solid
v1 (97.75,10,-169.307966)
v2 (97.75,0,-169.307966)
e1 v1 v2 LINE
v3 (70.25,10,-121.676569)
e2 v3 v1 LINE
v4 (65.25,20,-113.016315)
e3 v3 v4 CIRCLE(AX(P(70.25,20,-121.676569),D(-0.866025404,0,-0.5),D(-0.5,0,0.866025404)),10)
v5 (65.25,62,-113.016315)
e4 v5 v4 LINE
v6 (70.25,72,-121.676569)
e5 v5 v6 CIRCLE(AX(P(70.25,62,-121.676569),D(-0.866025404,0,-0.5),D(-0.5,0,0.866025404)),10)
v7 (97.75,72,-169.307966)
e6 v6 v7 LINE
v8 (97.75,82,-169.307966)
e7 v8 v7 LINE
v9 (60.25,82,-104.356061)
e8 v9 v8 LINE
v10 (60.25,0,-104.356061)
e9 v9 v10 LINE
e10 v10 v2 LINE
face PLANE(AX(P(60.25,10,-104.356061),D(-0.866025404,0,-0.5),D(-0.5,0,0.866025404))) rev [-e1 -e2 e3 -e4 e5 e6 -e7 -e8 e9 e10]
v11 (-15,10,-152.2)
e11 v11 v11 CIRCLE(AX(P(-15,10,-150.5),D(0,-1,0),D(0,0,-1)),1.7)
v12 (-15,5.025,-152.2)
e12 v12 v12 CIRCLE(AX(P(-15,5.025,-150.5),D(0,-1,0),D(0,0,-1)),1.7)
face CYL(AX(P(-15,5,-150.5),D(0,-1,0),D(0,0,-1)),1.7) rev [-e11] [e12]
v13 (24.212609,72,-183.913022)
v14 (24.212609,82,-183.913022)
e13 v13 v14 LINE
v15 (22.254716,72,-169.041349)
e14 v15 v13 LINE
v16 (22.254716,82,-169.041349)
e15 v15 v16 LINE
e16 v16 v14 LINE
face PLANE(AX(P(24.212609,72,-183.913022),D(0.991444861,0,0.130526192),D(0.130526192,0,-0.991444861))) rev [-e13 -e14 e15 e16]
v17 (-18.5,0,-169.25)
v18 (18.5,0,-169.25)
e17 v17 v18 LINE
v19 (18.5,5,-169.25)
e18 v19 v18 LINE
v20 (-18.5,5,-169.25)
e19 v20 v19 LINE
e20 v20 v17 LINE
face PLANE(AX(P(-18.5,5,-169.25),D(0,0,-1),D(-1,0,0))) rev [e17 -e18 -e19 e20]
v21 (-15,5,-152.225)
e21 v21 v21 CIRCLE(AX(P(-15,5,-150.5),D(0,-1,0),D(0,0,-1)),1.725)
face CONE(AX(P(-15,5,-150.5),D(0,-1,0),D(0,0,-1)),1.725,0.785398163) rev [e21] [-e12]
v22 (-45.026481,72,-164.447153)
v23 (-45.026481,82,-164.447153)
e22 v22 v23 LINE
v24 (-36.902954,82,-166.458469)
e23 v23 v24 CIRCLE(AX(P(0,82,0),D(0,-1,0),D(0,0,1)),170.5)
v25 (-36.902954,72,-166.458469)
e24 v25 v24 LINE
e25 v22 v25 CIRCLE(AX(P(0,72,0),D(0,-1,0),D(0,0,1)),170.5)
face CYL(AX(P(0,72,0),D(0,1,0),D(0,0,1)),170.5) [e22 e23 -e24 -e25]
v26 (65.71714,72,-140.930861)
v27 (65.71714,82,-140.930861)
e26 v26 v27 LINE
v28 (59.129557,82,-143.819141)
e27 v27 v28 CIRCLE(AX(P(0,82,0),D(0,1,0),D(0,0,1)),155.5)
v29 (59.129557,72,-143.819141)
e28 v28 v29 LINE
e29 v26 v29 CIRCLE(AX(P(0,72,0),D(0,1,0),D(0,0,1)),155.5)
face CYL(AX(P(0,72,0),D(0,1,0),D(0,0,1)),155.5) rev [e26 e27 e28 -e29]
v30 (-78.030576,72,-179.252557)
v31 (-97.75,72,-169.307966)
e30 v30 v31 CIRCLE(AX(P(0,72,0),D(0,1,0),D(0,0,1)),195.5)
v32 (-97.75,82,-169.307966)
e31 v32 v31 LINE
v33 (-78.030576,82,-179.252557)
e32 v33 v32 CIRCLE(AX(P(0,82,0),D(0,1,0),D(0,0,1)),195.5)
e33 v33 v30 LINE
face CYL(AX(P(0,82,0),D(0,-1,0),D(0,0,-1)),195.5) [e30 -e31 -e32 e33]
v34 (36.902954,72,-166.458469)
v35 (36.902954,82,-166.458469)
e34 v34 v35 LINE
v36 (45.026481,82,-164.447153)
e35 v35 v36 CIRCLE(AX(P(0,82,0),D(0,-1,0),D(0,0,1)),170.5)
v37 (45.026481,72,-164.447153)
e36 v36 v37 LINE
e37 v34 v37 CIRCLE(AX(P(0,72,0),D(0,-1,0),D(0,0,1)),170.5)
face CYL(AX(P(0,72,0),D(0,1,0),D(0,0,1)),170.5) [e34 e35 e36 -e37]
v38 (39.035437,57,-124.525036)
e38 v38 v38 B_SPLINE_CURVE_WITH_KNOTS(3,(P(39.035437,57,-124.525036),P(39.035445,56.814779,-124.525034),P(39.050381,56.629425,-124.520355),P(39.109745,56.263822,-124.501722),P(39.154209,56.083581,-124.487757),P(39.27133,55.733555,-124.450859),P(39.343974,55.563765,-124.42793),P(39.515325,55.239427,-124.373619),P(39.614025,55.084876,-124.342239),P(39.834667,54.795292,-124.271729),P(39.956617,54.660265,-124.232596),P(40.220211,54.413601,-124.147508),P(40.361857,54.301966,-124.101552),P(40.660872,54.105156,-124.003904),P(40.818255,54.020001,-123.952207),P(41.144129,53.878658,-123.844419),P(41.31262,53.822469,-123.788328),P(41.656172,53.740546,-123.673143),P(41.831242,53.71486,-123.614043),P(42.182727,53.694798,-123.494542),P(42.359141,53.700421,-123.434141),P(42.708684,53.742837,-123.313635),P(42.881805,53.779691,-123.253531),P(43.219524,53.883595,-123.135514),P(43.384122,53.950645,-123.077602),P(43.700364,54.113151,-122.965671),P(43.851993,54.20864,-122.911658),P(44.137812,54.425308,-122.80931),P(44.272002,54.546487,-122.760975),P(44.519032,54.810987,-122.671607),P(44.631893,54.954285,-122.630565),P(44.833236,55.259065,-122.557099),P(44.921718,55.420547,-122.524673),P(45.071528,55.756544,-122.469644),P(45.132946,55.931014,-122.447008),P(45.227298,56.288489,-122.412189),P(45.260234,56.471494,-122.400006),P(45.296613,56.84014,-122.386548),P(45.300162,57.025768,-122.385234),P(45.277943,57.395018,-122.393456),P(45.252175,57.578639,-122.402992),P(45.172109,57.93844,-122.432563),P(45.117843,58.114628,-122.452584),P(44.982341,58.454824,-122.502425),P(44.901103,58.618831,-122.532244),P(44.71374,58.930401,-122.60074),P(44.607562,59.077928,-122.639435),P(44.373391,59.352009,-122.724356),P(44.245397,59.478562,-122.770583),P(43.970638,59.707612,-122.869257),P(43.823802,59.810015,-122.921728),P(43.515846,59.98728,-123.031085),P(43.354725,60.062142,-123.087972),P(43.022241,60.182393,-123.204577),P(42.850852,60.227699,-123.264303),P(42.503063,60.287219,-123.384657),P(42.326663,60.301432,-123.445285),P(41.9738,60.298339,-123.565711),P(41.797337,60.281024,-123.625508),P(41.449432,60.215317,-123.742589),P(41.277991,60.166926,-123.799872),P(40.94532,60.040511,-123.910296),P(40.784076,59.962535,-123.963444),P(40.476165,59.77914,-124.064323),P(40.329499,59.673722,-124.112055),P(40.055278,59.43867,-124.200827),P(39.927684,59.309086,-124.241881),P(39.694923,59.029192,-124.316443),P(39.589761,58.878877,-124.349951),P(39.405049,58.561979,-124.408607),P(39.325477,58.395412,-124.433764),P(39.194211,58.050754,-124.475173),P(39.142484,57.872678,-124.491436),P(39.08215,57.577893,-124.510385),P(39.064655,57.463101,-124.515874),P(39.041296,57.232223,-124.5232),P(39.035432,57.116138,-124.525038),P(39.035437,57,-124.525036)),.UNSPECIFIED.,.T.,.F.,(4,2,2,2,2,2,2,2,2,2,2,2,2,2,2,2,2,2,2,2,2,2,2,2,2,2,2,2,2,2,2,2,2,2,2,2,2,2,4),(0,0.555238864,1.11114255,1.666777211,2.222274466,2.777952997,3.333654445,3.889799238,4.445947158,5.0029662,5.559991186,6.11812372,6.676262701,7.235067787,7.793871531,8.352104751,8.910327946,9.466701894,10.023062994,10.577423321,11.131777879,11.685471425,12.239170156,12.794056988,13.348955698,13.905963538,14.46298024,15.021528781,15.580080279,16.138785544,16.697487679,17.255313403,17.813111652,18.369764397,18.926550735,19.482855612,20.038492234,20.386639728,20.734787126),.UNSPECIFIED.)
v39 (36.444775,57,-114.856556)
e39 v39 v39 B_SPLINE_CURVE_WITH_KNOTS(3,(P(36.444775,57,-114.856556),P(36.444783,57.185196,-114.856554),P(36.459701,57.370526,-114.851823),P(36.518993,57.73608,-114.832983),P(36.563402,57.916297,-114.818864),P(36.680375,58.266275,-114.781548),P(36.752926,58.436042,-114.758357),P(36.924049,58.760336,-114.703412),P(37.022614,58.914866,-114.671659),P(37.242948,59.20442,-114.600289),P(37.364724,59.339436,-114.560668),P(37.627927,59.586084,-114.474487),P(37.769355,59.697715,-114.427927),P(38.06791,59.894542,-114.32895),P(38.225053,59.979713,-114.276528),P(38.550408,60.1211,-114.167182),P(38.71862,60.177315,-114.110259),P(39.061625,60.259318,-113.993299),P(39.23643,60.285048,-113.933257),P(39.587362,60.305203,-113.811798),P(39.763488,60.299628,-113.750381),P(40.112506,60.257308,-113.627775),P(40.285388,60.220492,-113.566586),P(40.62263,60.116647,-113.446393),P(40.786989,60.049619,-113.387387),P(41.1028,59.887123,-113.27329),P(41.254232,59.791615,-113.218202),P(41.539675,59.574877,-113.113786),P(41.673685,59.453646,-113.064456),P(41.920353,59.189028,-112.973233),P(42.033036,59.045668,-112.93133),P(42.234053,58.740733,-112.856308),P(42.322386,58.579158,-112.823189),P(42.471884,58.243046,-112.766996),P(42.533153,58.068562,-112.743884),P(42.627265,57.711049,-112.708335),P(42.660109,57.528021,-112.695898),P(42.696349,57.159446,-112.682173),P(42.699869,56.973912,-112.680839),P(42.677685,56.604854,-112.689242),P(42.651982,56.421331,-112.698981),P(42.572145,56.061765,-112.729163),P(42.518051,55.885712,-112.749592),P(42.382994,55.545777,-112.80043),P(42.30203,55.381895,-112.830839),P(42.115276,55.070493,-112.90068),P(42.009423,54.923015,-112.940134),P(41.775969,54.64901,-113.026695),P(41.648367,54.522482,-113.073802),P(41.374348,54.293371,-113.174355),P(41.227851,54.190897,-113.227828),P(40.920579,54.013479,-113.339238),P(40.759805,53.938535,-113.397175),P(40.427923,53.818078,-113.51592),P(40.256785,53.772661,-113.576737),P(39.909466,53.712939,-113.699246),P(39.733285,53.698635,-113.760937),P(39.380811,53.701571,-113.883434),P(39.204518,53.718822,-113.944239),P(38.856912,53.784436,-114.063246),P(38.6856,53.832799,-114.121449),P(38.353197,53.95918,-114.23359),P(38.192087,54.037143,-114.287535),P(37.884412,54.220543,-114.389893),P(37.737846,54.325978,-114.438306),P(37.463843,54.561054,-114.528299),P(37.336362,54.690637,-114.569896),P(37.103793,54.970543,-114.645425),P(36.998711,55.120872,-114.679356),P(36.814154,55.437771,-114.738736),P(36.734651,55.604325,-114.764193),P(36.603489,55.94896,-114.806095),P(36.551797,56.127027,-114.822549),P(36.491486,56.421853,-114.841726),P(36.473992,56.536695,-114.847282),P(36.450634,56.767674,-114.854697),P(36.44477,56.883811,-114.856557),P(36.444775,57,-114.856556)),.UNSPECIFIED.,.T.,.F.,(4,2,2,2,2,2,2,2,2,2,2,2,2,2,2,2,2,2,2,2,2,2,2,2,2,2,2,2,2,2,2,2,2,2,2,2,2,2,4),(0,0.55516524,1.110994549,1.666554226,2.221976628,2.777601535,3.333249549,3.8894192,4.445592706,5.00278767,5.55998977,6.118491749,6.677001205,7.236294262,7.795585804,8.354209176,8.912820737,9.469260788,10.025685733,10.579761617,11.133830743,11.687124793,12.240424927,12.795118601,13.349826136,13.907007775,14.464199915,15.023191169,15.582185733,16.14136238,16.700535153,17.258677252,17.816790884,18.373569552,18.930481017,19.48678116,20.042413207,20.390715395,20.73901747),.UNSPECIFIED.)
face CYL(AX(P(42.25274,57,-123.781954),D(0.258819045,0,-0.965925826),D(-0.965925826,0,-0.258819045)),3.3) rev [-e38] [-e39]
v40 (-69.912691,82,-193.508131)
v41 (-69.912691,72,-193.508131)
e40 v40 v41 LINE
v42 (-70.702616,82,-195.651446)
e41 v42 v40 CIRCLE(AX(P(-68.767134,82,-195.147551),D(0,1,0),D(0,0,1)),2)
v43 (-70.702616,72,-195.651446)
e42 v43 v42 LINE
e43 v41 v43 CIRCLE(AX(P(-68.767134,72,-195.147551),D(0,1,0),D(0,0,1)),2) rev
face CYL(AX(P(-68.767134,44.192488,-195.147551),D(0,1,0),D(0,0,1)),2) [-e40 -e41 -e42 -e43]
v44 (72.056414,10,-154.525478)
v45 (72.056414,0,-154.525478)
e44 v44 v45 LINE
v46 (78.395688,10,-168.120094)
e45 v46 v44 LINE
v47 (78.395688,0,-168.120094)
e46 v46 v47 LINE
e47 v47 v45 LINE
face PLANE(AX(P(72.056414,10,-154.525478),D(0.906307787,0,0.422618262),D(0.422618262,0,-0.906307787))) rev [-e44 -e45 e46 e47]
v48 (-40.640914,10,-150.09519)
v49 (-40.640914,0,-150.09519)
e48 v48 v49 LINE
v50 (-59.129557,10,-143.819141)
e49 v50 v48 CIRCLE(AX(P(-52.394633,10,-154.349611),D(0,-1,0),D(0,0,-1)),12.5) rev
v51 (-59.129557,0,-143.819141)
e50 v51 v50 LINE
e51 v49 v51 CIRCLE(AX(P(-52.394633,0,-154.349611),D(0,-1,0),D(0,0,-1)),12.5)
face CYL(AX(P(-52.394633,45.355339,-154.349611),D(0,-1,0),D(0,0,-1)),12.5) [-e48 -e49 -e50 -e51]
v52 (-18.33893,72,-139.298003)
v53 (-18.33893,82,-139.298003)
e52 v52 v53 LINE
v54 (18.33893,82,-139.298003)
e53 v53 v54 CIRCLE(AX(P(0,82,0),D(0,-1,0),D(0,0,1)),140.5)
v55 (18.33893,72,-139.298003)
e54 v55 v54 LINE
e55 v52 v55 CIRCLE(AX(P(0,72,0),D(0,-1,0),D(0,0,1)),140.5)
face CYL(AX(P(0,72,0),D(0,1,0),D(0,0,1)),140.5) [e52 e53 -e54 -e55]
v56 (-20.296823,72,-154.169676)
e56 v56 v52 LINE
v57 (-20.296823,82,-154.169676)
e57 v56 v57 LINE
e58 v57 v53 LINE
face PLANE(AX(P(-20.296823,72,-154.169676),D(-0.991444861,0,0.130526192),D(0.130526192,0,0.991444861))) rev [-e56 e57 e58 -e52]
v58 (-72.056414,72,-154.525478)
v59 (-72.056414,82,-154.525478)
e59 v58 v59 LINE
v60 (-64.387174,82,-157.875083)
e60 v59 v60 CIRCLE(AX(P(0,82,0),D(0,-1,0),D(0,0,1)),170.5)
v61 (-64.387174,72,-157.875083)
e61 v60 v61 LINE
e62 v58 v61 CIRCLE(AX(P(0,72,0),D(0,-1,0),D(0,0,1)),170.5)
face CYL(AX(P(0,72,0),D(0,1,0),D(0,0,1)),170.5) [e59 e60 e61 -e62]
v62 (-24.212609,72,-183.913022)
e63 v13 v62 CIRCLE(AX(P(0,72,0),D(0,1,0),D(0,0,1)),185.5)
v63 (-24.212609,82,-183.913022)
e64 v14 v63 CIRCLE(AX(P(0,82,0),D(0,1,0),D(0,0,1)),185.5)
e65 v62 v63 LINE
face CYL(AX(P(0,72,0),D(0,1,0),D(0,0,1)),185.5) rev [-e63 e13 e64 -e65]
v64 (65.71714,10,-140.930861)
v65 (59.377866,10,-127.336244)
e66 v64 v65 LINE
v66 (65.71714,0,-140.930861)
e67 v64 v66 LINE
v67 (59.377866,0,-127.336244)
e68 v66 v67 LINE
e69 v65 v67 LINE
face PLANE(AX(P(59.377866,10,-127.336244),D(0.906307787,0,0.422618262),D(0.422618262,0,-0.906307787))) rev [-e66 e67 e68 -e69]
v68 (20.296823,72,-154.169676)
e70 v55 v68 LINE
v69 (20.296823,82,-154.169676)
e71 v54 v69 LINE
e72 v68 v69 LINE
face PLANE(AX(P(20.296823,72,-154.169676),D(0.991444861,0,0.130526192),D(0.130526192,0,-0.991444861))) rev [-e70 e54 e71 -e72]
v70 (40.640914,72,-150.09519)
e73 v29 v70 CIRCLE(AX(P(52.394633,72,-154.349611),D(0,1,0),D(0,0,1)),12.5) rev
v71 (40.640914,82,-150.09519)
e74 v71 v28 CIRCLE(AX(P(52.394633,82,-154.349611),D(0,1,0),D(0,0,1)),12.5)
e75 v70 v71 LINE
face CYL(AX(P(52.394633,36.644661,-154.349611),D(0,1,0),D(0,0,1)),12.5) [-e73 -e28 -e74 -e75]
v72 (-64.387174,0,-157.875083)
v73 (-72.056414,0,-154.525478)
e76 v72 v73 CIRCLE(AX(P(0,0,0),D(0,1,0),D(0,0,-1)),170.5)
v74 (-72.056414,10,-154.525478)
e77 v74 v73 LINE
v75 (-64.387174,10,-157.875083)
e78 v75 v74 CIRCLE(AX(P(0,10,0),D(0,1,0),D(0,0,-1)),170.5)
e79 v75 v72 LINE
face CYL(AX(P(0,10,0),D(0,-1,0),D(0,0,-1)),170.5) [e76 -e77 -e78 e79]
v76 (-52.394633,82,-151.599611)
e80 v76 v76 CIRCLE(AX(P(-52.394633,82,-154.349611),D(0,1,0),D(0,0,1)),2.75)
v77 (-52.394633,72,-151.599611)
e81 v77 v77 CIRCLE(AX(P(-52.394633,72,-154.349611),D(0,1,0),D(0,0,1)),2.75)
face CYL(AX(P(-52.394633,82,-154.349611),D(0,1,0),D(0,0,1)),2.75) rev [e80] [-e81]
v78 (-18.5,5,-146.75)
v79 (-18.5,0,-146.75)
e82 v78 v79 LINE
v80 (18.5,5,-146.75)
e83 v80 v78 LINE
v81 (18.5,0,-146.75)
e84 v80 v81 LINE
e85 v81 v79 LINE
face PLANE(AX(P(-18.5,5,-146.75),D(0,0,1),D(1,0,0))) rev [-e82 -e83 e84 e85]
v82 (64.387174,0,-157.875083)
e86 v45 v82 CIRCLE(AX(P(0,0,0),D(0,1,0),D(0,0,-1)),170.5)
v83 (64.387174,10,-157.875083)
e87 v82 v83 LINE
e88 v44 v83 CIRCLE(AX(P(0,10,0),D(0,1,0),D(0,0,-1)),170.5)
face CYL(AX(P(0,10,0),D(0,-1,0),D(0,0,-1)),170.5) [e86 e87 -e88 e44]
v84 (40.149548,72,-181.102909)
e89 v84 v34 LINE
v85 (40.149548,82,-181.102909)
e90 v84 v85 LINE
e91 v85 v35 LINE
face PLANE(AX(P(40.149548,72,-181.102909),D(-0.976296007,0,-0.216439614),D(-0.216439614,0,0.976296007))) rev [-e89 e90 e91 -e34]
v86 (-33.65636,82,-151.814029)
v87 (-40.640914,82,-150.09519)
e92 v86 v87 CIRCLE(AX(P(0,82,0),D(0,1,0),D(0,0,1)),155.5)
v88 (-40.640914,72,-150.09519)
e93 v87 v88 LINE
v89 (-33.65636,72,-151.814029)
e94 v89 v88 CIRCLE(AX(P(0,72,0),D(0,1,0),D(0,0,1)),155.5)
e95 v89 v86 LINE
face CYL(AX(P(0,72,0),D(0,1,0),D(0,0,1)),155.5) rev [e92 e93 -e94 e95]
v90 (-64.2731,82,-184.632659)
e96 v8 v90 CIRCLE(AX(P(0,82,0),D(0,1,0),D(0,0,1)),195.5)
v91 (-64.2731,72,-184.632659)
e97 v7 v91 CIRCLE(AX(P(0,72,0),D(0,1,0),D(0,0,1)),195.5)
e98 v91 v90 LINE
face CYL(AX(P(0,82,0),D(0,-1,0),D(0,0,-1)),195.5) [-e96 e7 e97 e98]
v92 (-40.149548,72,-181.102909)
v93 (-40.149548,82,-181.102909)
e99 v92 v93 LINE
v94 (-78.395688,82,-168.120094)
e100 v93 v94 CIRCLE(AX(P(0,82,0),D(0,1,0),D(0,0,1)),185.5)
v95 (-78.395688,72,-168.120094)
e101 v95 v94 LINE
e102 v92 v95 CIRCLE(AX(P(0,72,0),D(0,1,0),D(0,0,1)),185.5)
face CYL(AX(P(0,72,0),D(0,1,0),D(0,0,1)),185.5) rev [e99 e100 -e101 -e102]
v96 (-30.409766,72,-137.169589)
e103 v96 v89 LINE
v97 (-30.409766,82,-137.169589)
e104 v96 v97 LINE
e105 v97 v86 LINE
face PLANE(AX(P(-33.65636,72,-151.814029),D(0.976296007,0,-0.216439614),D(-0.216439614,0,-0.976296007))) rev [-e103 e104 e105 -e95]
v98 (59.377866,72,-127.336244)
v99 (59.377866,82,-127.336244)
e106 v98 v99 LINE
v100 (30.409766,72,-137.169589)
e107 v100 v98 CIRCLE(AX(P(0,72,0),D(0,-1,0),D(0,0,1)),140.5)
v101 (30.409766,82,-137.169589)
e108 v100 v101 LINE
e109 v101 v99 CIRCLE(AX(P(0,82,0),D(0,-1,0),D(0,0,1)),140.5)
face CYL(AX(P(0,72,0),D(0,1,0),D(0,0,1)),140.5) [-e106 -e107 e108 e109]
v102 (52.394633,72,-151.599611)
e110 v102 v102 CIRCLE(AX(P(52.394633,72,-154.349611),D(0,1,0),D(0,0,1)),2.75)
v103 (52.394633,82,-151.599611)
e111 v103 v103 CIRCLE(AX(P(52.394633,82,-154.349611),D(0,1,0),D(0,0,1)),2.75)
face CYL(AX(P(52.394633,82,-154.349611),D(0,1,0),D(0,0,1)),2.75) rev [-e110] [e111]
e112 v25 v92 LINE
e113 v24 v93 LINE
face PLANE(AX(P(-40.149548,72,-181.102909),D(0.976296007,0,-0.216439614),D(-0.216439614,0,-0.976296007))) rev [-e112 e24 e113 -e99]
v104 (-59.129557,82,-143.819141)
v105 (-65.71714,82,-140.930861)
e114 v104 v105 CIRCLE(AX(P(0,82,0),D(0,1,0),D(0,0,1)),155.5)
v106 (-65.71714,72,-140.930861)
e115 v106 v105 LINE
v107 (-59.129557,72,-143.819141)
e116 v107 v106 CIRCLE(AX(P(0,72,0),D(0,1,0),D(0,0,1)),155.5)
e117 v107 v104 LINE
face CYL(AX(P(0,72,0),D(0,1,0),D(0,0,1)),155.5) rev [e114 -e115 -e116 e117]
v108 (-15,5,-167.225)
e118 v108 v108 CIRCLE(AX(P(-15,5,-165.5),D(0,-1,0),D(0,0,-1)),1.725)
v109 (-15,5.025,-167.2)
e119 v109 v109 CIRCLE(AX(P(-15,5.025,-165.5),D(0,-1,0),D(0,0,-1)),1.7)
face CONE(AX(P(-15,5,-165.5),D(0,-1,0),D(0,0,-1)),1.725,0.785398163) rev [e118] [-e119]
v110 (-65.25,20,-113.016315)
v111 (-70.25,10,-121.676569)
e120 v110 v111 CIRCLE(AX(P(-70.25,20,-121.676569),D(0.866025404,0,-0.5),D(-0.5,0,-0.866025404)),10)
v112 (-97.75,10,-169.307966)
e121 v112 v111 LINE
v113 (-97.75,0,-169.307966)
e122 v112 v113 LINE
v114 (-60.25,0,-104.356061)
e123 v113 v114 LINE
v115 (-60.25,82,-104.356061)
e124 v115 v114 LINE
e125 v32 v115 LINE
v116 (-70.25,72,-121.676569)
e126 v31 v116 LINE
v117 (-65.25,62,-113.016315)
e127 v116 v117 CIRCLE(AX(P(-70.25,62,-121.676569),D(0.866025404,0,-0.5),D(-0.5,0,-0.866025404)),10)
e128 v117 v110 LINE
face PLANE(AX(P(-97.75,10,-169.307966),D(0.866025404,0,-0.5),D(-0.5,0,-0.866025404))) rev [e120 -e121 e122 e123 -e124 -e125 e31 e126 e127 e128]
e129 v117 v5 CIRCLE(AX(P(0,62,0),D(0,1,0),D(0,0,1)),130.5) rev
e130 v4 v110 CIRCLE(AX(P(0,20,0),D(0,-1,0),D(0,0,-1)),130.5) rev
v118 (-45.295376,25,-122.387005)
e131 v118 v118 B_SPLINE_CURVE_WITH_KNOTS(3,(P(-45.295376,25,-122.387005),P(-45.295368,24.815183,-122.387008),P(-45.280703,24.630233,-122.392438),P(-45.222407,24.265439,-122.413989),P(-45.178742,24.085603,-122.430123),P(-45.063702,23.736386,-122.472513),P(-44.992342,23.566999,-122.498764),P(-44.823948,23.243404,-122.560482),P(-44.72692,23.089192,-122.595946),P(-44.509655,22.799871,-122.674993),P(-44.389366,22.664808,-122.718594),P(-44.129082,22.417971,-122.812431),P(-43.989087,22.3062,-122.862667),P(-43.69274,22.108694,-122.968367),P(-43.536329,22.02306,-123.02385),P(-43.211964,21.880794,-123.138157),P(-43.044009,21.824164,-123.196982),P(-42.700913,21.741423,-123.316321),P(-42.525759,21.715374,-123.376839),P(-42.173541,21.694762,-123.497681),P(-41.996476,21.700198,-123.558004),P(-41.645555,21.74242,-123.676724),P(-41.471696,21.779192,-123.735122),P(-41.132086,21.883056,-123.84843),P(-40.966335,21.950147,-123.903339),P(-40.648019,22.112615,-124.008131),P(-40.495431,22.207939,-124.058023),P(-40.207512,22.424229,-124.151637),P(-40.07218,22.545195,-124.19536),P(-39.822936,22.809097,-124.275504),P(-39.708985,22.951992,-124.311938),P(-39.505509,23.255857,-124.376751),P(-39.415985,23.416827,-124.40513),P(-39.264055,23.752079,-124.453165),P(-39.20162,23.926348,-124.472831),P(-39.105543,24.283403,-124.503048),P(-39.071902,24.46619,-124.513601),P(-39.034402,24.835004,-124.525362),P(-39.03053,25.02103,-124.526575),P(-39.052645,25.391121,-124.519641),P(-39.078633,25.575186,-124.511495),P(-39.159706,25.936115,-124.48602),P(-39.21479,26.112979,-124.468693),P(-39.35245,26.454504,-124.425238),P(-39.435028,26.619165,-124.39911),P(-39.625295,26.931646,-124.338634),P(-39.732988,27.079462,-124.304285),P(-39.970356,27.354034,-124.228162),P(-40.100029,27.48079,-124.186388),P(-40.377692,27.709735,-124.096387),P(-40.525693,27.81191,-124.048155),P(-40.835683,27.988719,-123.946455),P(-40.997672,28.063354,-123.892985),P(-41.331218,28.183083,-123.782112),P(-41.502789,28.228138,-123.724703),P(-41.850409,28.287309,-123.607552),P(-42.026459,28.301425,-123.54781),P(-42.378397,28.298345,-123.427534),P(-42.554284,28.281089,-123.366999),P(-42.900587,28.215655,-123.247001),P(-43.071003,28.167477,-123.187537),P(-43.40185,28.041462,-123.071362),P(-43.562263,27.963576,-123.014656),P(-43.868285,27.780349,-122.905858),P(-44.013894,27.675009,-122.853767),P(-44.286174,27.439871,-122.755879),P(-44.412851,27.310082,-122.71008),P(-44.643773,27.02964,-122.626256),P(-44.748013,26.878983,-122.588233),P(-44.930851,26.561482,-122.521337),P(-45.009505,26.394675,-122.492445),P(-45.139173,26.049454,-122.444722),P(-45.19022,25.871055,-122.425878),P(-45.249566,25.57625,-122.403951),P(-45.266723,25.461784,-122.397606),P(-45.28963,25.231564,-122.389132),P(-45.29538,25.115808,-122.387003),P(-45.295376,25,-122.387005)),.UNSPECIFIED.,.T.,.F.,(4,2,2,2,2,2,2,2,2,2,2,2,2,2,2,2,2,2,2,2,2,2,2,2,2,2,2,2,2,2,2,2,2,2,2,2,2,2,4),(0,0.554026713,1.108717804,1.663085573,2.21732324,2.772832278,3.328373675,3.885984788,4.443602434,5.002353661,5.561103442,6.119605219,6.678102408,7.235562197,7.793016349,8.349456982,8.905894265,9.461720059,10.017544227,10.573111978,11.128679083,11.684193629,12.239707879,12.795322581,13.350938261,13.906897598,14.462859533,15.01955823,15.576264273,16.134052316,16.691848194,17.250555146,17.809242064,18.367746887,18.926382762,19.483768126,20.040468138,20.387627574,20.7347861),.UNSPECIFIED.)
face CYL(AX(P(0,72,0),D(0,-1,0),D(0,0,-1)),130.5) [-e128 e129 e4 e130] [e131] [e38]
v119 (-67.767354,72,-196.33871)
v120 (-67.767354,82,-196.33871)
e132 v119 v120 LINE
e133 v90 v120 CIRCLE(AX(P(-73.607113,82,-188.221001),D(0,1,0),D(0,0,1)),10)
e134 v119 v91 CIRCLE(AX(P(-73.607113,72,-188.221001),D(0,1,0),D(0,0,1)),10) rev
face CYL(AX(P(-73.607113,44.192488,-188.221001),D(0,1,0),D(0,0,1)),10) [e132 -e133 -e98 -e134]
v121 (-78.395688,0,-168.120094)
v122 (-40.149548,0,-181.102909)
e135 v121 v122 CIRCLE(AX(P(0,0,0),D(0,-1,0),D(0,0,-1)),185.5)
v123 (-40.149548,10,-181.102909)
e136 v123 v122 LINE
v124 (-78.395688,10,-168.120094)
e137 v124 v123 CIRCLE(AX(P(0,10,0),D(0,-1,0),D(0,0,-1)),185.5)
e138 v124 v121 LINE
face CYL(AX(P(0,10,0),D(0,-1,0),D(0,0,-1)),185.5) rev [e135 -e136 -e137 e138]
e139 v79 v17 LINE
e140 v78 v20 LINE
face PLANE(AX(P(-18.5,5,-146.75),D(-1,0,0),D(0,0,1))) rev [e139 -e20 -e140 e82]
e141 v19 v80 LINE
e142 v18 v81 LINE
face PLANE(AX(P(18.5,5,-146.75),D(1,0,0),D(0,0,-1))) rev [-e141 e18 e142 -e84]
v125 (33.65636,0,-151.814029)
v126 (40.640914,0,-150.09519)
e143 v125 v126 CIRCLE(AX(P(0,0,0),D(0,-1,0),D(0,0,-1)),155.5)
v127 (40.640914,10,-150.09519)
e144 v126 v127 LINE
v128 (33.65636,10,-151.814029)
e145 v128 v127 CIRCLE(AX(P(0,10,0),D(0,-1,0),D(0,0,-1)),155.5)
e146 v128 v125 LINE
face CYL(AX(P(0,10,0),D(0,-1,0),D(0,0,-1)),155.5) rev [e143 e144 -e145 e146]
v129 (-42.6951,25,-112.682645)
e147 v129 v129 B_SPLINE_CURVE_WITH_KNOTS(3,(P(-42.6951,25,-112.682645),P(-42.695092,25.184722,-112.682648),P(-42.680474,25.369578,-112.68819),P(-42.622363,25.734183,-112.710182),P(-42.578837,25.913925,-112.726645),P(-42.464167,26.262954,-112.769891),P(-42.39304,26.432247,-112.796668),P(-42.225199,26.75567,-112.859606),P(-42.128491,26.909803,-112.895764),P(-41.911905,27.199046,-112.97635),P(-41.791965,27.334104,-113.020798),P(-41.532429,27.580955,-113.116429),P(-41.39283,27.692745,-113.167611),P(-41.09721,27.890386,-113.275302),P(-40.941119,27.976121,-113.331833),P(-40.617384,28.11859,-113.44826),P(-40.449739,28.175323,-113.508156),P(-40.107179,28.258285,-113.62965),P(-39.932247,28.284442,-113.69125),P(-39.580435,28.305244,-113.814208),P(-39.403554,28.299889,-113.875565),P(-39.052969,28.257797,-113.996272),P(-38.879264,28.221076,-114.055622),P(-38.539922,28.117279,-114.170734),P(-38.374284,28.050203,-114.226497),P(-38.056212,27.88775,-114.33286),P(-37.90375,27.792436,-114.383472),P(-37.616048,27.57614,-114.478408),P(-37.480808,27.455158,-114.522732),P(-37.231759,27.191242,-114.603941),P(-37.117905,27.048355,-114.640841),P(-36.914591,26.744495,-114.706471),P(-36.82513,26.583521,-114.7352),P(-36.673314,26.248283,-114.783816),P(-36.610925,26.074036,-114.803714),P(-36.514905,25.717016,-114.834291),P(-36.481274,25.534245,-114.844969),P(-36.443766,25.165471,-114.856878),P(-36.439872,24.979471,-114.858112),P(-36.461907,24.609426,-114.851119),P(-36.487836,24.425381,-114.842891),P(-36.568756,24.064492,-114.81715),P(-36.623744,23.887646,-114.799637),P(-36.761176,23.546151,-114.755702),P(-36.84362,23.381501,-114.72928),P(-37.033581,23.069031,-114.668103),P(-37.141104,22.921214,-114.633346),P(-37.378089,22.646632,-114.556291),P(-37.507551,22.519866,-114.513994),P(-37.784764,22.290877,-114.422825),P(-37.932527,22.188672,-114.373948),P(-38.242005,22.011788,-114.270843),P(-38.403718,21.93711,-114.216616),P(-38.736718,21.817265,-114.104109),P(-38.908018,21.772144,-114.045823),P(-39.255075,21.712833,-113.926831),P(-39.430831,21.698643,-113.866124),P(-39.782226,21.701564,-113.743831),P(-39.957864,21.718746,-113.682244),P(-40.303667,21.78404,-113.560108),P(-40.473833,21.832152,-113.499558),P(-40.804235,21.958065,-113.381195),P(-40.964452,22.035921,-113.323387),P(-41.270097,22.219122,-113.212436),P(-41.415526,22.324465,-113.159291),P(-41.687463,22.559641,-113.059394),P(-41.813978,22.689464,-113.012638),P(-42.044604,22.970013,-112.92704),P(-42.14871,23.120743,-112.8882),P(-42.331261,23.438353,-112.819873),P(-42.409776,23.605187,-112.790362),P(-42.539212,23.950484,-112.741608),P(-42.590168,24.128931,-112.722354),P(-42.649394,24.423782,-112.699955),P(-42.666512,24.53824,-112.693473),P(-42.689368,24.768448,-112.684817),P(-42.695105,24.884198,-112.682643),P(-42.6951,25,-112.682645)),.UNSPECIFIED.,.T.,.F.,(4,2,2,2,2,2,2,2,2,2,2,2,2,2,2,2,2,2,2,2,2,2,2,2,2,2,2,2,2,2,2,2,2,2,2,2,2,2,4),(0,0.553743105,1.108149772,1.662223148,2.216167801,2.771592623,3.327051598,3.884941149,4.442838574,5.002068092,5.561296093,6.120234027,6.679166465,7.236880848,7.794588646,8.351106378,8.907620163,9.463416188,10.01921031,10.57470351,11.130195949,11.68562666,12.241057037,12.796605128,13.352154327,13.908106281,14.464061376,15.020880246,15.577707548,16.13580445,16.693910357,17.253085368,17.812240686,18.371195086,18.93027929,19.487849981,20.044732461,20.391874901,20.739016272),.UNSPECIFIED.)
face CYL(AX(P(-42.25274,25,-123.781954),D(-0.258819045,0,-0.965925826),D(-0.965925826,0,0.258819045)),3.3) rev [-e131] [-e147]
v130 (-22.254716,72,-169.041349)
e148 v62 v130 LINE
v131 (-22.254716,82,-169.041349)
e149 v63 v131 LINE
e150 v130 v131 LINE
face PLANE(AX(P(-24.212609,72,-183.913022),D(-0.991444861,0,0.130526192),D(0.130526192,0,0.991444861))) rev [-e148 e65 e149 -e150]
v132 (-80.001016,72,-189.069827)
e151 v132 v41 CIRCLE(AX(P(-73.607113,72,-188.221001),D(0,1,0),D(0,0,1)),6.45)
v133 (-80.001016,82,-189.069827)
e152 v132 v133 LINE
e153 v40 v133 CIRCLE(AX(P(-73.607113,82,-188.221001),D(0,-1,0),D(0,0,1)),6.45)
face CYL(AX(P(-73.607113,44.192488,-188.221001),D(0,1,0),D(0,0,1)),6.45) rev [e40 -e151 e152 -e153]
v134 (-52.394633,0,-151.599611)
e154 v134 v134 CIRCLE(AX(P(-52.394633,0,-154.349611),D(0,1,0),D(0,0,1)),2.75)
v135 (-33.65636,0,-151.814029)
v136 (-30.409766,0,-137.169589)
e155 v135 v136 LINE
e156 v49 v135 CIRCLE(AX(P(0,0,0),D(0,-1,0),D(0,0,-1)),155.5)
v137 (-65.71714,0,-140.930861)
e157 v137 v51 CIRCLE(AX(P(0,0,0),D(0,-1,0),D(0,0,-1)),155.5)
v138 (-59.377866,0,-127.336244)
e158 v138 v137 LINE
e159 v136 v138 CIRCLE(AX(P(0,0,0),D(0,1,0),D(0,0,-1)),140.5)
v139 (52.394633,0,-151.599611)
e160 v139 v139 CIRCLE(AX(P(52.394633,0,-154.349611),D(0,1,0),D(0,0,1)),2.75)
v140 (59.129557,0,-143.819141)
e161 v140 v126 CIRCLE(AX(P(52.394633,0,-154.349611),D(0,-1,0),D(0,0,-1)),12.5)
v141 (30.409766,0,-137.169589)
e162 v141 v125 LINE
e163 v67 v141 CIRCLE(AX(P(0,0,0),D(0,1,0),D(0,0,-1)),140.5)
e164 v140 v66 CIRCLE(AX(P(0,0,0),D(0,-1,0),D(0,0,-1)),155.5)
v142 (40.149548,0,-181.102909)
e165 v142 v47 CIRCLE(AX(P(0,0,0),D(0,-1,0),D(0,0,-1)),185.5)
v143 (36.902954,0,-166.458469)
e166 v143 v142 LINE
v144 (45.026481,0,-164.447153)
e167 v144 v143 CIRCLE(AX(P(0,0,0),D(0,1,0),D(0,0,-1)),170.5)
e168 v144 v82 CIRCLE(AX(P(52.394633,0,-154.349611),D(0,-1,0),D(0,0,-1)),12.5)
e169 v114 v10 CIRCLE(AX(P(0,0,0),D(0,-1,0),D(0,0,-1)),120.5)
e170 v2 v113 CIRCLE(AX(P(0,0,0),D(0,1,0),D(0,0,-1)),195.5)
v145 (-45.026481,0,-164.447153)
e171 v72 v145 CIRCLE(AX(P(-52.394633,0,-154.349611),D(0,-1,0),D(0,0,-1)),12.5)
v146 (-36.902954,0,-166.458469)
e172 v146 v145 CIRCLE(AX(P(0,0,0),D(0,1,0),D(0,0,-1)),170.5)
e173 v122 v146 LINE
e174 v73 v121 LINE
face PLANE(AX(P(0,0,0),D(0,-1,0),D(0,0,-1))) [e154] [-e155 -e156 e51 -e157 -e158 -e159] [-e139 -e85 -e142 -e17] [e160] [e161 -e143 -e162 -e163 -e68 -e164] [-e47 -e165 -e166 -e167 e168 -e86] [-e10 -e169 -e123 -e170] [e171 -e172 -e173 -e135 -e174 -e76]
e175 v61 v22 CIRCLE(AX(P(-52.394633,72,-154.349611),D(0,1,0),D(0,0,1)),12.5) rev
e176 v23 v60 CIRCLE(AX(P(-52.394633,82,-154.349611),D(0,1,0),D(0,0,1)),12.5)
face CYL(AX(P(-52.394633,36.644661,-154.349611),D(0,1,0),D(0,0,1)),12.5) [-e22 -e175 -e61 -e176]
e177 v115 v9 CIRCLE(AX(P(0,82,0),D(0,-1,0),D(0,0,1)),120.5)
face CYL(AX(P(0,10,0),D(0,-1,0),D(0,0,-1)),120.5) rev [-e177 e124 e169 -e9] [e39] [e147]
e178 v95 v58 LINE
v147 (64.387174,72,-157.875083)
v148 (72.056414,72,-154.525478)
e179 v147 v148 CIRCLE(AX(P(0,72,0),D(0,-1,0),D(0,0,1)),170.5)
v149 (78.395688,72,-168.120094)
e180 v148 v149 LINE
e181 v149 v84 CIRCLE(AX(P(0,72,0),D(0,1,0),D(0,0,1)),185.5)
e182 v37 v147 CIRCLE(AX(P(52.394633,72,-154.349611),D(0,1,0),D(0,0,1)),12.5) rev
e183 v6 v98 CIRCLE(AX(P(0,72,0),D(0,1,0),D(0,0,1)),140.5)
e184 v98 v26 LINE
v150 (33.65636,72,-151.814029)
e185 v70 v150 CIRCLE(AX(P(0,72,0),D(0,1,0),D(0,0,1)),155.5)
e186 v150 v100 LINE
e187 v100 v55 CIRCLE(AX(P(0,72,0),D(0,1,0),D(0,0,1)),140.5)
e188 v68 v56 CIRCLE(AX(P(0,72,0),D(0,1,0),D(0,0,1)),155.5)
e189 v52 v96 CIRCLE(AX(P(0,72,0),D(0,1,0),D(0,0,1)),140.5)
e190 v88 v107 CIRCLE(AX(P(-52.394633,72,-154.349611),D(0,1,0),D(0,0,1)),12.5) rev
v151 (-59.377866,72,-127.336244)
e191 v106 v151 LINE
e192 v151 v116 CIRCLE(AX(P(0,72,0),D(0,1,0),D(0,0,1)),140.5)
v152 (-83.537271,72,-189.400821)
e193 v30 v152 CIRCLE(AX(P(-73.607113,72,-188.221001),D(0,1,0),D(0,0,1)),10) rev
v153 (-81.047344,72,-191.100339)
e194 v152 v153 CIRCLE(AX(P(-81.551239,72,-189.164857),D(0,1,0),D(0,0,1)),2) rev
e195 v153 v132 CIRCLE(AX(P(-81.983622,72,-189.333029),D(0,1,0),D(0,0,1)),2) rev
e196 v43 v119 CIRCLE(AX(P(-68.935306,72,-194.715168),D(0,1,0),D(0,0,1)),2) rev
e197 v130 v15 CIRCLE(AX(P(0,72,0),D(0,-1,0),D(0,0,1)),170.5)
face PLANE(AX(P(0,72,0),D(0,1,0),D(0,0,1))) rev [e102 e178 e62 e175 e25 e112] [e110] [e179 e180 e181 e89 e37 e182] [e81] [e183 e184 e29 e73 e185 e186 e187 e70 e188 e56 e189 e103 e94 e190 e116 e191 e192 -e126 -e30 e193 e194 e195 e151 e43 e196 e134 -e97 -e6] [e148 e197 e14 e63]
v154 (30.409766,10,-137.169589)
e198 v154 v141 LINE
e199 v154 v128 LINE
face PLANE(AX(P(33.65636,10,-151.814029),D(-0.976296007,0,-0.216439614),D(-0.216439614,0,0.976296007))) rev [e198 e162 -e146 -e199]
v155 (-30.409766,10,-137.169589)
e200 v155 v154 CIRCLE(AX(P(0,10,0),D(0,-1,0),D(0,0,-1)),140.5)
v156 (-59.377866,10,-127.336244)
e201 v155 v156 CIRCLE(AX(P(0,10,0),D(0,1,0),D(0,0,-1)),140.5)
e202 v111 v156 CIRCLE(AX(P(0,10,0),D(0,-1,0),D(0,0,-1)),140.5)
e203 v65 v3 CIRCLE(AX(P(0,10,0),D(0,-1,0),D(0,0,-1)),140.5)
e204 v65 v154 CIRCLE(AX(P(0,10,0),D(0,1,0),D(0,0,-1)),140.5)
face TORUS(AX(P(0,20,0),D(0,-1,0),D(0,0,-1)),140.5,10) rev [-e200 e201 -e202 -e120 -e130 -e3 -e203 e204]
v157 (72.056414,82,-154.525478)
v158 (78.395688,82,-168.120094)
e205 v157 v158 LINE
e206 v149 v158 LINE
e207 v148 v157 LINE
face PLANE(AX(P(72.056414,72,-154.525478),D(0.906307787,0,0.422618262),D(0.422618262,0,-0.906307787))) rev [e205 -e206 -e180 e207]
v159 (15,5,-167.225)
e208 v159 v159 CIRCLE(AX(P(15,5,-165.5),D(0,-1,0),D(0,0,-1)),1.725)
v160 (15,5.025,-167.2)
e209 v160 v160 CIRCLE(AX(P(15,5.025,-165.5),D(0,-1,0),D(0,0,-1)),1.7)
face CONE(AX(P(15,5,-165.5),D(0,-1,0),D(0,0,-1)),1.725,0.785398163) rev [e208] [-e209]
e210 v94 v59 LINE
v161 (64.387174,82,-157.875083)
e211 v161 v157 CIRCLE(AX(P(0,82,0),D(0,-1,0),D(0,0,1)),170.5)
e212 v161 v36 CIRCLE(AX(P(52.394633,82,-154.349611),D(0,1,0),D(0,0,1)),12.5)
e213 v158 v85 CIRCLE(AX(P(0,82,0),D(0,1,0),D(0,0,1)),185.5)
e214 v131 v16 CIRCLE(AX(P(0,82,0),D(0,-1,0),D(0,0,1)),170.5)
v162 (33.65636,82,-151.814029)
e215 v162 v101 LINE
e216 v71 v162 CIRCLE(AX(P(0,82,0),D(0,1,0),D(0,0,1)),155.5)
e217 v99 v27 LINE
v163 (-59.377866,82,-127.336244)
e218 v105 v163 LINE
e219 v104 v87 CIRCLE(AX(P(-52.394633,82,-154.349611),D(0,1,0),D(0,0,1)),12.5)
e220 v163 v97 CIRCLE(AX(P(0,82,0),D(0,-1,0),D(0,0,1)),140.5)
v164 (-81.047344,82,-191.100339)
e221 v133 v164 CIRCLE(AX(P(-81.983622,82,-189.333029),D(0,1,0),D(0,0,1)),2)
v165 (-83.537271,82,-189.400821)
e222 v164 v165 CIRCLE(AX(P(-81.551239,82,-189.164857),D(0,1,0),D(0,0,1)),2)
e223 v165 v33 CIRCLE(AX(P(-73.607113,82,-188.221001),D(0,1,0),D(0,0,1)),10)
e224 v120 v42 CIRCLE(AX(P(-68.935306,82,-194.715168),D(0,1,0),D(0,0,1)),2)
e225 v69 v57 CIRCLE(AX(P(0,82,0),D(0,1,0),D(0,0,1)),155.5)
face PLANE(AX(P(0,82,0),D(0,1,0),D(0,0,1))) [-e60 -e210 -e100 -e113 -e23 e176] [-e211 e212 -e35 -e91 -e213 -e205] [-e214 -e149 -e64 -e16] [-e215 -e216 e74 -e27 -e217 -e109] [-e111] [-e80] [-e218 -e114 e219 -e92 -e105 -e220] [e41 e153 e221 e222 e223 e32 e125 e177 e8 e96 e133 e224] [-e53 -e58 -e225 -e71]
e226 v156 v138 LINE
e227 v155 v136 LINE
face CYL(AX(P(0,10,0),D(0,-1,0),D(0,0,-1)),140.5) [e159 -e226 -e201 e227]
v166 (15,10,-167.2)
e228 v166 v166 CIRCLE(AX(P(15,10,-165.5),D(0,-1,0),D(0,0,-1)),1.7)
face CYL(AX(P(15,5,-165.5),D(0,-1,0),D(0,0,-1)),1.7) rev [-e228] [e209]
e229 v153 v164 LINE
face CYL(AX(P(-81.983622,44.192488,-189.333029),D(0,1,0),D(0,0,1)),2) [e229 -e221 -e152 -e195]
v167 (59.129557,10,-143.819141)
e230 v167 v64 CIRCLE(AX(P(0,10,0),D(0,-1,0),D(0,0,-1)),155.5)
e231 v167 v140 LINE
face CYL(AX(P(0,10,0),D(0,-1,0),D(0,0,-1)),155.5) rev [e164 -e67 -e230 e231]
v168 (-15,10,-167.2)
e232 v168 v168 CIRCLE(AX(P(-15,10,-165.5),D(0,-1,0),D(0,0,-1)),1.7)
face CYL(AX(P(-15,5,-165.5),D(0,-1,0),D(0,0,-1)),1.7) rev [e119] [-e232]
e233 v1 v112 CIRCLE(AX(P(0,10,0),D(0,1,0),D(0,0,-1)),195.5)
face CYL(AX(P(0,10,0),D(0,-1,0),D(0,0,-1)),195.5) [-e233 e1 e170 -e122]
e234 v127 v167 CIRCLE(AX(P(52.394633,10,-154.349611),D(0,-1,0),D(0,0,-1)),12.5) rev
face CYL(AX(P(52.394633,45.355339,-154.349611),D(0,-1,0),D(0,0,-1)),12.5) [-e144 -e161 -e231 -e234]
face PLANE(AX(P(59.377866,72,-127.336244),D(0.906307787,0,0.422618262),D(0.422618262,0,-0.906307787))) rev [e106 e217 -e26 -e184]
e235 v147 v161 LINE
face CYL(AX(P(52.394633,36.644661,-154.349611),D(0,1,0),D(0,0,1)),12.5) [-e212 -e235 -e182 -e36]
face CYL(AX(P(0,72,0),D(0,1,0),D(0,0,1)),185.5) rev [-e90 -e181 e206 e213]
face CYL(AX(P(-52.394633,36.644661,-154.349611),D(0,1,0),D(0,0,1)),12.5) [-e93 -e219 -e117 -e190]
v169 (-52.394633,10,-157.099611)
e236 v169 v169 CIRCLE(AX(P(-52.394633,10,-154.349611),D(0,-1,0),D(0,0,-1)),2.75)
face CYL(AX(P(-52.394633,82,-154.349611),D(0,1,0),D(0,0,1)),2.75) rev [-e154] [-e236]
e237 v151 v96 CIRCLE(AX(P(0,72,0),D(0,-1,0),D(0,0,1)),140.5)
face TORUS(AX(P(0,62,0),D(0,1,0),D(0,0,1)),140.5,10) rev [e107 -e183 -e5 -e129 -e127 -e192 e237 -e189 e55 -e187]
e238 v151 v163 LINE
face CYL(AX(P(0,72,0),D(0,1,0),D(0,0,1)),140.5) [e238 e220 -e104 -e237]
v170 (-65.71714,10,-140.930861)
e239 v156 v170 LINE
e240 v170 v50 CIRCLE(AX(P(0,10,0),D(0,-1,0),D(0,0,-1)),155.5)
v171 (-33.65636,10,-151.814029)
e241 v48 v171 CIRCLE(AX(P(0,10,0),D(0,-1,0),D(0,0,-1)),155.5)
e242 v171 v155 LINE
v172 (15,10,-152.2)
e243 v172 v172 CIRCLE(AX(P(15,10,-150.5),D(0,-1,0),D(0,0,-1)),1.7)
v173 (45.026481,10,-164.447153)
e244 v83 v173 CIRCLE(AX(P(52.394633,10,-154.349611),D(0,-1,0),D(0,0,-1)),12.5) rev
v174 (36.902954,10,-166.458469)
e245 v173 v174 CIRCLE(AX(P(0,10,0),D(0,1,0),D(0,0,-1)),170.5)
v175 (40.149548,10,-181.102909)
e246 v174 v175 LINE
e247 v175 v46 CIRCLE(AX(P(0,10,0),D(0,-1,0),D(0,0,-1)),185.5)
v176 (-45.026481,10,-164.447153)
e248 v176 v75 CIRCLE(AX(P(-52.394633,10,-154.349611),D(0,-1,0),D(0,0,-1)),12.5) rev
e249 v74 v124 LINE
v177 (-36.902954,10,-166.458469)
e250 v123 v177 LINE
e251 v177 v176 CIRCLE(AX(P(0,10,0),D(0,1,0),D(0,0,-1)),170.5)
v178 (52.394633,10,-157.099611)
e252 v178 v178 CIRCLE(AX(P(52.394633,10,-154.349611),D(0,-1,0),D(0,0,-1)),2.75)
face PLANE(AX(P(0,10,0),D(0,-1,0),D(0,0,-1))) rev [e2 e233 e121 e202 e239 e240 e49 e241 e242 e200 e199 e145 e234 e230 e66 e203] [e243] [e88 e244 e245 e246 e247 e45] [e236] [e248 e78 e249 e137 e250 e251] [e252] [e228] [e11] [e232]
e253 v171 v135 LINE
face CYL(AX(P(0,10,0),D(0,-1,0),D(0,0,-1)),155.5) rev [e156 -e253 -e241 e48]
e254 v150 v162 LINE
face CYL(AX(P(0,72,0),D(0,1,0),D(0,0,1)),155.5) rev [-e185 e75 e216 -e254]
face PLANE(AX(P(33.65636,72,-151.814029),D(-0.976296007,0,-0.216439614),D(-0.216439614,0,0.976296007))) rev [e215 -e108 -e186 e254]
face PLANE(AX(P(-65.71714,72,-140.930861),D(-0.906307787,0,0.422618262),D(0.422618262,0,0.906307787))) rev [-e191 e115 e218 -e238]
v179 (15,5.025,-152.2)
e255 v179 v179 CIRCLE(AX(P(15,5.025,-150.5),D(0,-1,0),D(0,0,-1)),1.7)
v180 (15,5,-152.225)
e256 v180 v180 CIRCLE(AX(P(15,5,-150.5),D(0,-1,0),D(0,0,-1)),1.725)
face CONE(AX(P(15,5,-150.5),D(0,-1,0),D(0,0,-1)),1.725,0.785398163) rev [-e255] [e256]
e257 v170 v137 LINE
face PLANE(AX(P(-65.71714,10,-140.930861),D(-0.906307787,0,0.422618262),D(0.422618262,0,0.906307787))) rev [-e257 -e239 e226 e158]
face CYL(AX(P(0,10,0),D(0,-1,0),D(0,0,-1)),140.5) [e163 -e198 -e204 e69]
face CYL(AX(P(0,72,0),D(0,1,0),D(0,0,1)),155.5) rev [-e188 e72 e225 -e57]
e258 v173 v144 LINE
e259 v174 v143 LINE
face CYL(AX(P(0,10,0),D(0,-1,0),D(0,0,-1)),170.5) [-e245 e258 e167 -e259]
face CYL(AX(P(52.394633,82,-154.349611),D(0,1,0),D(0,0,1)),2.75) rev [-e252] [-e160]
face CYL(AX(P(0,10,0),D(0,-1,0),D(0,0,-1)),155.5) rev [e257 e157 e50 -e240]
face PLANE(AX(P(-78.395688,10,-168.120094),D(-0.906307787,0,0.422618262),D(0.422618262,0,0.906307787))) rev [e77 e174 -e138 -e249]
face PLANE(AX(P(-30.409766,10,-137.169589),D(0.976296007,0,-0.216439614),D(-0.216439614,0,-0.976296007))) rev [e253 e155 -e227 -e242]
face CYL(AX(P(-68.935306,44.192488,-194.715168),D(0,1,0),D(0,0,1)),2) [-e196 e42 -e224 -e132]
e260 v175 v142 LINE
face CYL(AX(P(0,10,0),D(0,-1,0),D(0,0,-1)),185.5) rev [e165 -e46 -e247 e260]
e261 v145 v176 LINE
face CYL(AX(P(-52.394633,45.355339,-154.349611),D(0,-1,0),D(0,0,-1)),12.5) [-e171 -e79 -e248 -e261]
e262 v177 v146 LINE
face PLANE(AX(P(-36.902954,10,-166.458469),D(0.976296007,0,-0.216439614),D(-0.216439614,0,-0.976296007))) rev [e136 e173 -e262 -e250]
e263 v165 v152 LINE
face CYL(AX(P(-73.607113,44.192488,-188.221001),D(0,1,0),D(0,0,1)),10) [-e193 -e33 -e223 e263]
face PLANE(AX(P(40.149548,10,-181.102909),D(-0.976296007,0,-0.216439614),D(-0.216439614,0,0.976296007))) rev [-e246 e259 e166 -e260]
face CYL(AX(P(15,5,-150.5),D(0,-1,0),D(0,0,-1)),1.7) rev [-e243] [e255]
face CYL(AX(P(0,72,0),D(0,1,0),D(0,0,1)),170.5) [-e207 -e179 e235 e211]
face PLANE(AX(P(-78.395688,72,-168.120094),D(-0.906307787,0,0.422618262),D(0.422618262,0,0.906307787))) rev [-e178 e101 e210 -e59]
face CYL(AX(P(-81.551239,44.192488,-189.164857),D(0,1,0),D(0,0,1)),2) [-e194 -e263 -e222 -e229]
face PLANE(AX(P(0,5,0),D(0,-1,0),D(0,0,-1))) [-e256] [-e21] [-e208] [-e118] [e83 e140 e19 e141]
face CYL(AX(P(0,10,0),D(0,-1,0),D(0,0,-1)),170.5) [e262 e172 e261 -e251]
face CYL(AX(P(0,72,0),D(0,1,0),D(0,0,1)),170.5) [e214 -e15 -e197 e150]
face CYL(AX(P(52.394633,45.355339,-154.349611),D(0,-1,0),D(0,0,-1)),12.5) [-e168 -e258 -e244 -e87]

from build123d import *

# Parameters (mm, degrees)
SALIENTE_EXTRUIR1_DEPTH                = 10
CROQUIS5_W                             = 37
CROQUIS5_H                             = 22.5
CORTAR_EXTRUIR1_DEPTH                  = 5
TALADRO_DE_MARGEN_PARA_M31_D           = 3.4
TALADRO_DE_MARGEN_PARA_M31_CSINK_D     = 3.45
TALADRO_DE_MARGEN_PARA_M31_CSINK_ANGLE = 90
SALIENTE_EXTRUIR2_DEPTH                = 62
SALIENTE_EXTRUIR3_DEPTH                = 10
REDONDEO2_R                            = 10
CORTAR_EXTRUIR2_DEPTH                  = 10
CORTAR_EXTRUIR3_START                  = -10
CORTAR_EXTRUIR3_DEPTH                  = 10
TALADRO_DE_MARGEN_PARA_M61_D           = 6.6
TALADRO_DE_MARGEN_PARA_M61_CSINK_D     = 6.65
TALADRO_DE_MARGEN_PARA_M61_CSINK_ANGLE = 90
TALADRO_START                          = -130.385063418
TALADRO_DE_MARGEN_PARA_M62_OUTLINE_R   = 3.3
TALADRO_DE_MARGEN_PARA_M62_DEPTH       = 10.491681749
CROQUIS25_R                            = 12.5
SALIENTE_EXTRUIR4_DEPTH                = 10
SALIENTE_EXTRUIR5_START                = -10
CROQUIS26_R                            = 12.5
SALIENTE_EXTRUIR5_DEPTH                = 10
TALADRO_DE_MARGEN_PARA_M51_D           = 5.5
SALIENTE_EXTRUIR6_DEPTH                = 10
REDONDEO3_R                            = 2


# Read off the part's stored shape, not the designer's step: Taladro de margen para M62
with BuildPart() as part:
    # Croquis1 → Saliente-Extruir1 (new body)
    with BuildSketch(Plane(origin=(0, 0, 0), x_dir=(1, 0, 0), z_dir=(0, 1, 0))):
        with BuildLine():
            Line((-97.75, 169.30796644), (-60.25, 104.356061156))
            ThreePointArc((-60.25, 104.356061156), (0, 120.5), (60.25, 104.356061156))
            Line((60.25, 104.356061156), (97.75, 169.30796644))
            ThreePointArc((97.75, 169.30796644), (0, 195.5), (-97.75, 169.30796644))
        make_face()
    extrude(amount=SALIENTE_EXTRUIR1_DEPTH)

    # Croquis5 → Cortar-Extruir1 (cut)
    with BuildSketch(Plane.XZ):
        with Locations((0, -158)):
            Rectangle(CROQUIS5_W, CROQUIS5_H)
    extrude(amount=-CORTAR_EXTRUIR1_DEPTH, mode=Mode.SUBTRACT)

    # Taladro de margen para M31 (through all)
    with Locations(Plane(origin=(0, 5, 0), x_dir=(-1, 0, 0), z_dir=(0, -1, 0))):
        with Locations((-15, 165.5), (-15, 150.5), (15, 150.5), (15, 165.5)):
            CounterSinkHole(TALADRO_DE_MARGEN_PARA_M31_D / 2, TALADRO_DE_MARGEN_PARA_M31_CSINK_D / 2, counter_sink_angle=TALADRO_DE_MARGEN_PARA_M31_CSINK_ANGLE)

    # Croquis14 → Saliente-Extruir2 (add)
    with BuildSketch(Plane(origin=(0, 10, 0), x_dir=(1, 0, 0), z_dir=(0, 1, 0))):
        with BuildLine():
            Line((-65.25, 113.016315194), (-60.25, 104.356061156))
            ThreePointArc((-60.25, 104.356061156), (0, 120.5), (60.25, 104.356061156))
            Line((60.25, 104.356061156), (65.25, 113.016315194))
            ThreePointArc((65.25, 113.016315194), (0, 130.5), (-65.25, 113.016315194))
        make_face()
    extrude(amount=SALIENTE_EXTRUIR2_DEPTH)

    # Croquis15 → Saliente-Extruir3 (add)
    with BuildSketch(Plane(origin=(0, 72, 0), x_dir=(1, 0, 0), z_dir=(0, 1, 0))):
        with BuildLine():
            Line((-97.75, 169.30796644), (-60.25, 104.356061156))
            ThreePointArc((-60.25, 104.356061156), (0, 120.5), (60.25, 104.356061156))
            Line((60.25, 104.356061156), (97.75, 169.30796644))
            ThreePointArc((97.75, 169.30796644), (0, 195.5), (-97.75, 169.30796644))
        make_face()
    extrude(amount=SALIENTE_EXTRUIR3_DEPTH)

    # Redondeo2
    redondeo2_edges = [part.edges().sort_by_distance(p)[0] for p in [
        (0, 10, -130.5),
        (0, 72, -130.5),
    ]]
    fillet(redondeo2_edges, radius=REDONDEO2_R)

    # Croquis16 → Cortar-Extruir2 (cut)
    with BuildSketch(Plane(origin=(0, 82, 0), x_dir=(1, 0, 0), z_dir=(0, 1, 0))):
        with BuildLine():
            Line((-78.395687553, 168.120094495), (-72.056413627, 154.52547769))
            ThreePointArc((-72.056413627, 154.52547769), (-54.805428834, 161.451587079), (-36.902954176, 166.458469214))
            Line((-36.902954176, 166.458469214), (-40.149548386, 181.102909321))
            ThreePointArc((-40.149548386, 181.102909321), (-59.627020814, 175.655539021), (-78.395687553, 168.120094495))
        make_face()
        with BuildLine():
            Line((-65.717139701, 140.930860884), (-59.377865775, 127.336244079))
            ThreePointArc((-59.377865775, 127.336244079), (-45.162244875, 133.043683194), (-30.409765758, 137.169589))
            Line((-30.409765758, 137.169589), (-33.656359967, 151.814029107))
            ThreePointArc((-33.656359967, 151.814029107), (-49.983836855, 147.247635136), (-65.717139701, 140.930860884))
        make_face()
        with BuildLine():
            Line((-24.212608657, 183.913021785), (-22.254715774, 169.041348864))
            ThreePointArc((-22.254715774, 169.041348864), (0, 170.5), (22.254715774, 169.041348864))
            Line((22.254715774, 169.041348864), (24.212608657, 183.913021785))
            ThreePointArc((24.212608657, 183.913021785), (0, 185.5), (-24.212608657, 183.913021785))
        make_face()
        with BuildLine():
            Line((-20.29682289, 154.169675944), (-18.338930007, 139.298003023))
            ThreePointArc((-18.338930007, 139.298003023), (0, 140.5), (18.338930007, 139.298003023))
            Line((18.338930007, 139.298003023), (20.29682289, 154.169675944))
            ThreePointArc((20.29682289, 154.169675944), (0, 155.5), (-20.29682289, 154.169675944))
        make_face()
        with BuildLine():
            Line((40.149548386, 181.102909321), (36.902954176, 166.458469214))
            ThreePointArc((36.902954176, 166.458469214), (54.805428834, 161.451587079), (72.056413627, 154.52547769))
            Line((72.056413627, 154.52547769), (78.395687553, 168.120094495))
            ThreePointArc((78.395687553, 168.120094495), (59.627020814, 175.655539021), (40.149548386, 181.102909321))
        make_face()
        with BuildLine():
            Line((33.656359967, 151.814029107), (30.409765758, 137.169589))
            ThreePointArc((30.409765758, 137.169589), (45.162244875, 133.043683194), (59.377865775, 127.336244079))
            Line((59.377865775, 127.336244079), (65.717139701, 140.930860884))
            ThreePointArc((65.717139701, 140.930860884), (49.983836855, 147.247635136), (33.656359967, 151.814029107))
        make_face()
    extrude(amount=-CORTAR_EXTRUIR2_DEPTH, mode=Mode.SUBTRACT)

    # Croquis19 → Cortar-Extruir3 (cut)
    with BuildSketch(Plane.XZ.offset(CORTAR_EXTRUIR3_START)):
        with BuildLine():
            Line((72.056413627, -154.52547769), (78.395687553, -168.120094495))
            ThreePointArc((78.395687553, -168.120094495), (59.627020814, -175.655539021), (40.149548386, -181.102909321))
            Line((40.149548386, -181.102909321), (36.902954176, -166.458469214))
            ThreePointArc((36.902954176, -166.458469214), (54.805428834, -161.451587079), (72.056413627, -154.52547769))
        make_face()
        with BuildLine():
            Line((59.377865775, -127.336244079), (65.717139701, -140.930860884))
            ThreePointArc((65.717139701, -140.930860884), (49.983836855, -147.247635136), (33.656359967, -151.814029107))
            Line((33.656359967, -151.814029107), (30.409765758, -137.169589))
            ThreePointArc((30.409765758, -137.169589), (45.162244875, -133.043683194), (59.377865775, -127.336244079))
        make_face()
        with BuildLine():
            Line((-78.395687553, -168.120094495), (-72.056413627, -154.52547769))
            ThreePointArc((-72.056413627, -154.52547769), (-54.805428834, -161.451587079), (-36.902954176, -166.458469214))
            Line((-36.902954176, -166.458469214), (-40.149548386, -181.102909321))
            ThreePointArc((-40.149548386, -181.102909321), (-59.627020814, -175.655539021), (-78.395687553, -168.120094495))
        make_face()
        with BuildLine():
            Line((-65.717139701, -140.930860884), (-59.377865775, -127.336244079))
            ThreePointArc((-59.377865775, -127.336244079), (-45.162244875, -133.043683194), (-30.409765758, -137.169589))
            Line((-30.409765758, -137.169589), (-33.656359967, -151.814029107))
            ThreePointArc((-33.656359967, -151.814029107), (-49.983836855, -147.247635136), (-65.717139701, -140.930860884))
        make_face()
    extrude(amount=CORTAR_EXTRUIR3_DEPTH, mode=Mode.SUBTRACT)

    # Taladro de margen para M61 (through all)
    with Locations(Plane(origin=(33.775885386, 0, -126.053320331), x_dir=(0, -1, 0), z_dir=(0.2588190451025245, 0, -0.9659258262890673))):
        with Locations((-57, -8.775885386)):
            CounterSinkHole(TALADRO_DE_MARGEN_PARA_M61_D / 2, TALADRO_DE_MARGEN_PARA_M61_CSINK_D / 2, counter_sink_angle=TALADRO_DE_MARGEN_PARA_M61_CSINK_ANGLE)

    # Taladro de margen para M62 outline → Taladro de margen para M62 (cut)
    with BuildSketch(Plane(origin=(0, 0, 0), x_dir=(0.9659258262890672, 0, -0.2588190451025251), z_dir=(0.25881904510252507, 0, 0.9659258262890672)).offset(TALADRO_START)):
        with Locations((-8.775885386, 25)):
            Circle(TALADRO_DE_MARGEN_PARA_M62_OUTLINE_R)
    extrude(amount=TALADRO_DE_MARGEN_PARA_M62_DEPTH, mode=Mode.SUBTRACT)

    # Croquis25 → Saliente-Extruir4 (add)
    with BuildSketch(Plane(origin=(0, 82, 0), x_dir=(1, 0, 0), z_dir=(0, 1, 0))):
        with Locations((-52.394632844, 154.349611108)):
            Circle(CROQUIS25_R)
        with Locations((52.394632844, 154.349611108)):
            Circle(CROQUIS25_R)
    extrude(amount=-SALIENTE_EXTRUIR4_DEPTH)

    # Croquis26 → Saliente-Extruir5 (add)
    with BuildSketch(Plane.XZ.offset(SALIENTE_EXTRUIR5_START)):
        with Locations((-52.394632844, -154.349611108)):
            Circle(CROQUIS26_R)
        with Locations((52.394632844, -154.349611108)):
            Circle(CROQUIS26_R)
    extrude(amount=SALIENTE_EXTRUIR5_DEPTH)

    # Taladro de margen para M51 (through all)
    with Locations(Plane(origin=(0, 82, 0), x_dir=(1, 0, 0), z_dir=(0, 1, 0))):
        with Locations((-52.394632844, 154.349611108), (52.394632844, 154.349611108)):
            Hole(TALADRO_DE_MARGEN_PARA_M51_D / 2)

    # Croquis29 → Saliente-Extruir6 (add)
    with BuildSketch(Plane(origin=(0, 82, 0), x_dir=(1, 0, 0), z_dir=(0, 1, 0))):
        with BuildLine():
            Line((-82.926991651, 191.845896293), (-79.618434834, 190.55905839))
            ThreePointArc((-79.618434834, 190.55905839), (-71.00972345, 182.317098184), (-71.269055695, 194.232322333))
            Line((-71.269055695, 194.232322333), (-69.982217792, 197.54087915))
            ThreePointArc((-69.982217792, 197.54087915), (-69.580152297, 179.067663415), (-82.926991651, 191.845896293))
        make_face()
    extrude(amount=-SALIENTE_EXTRUIR6_DEPTH)

    # Redondeo3
    # the kernel refuses this fillet: 2 mm, written as the material it takes off along each edge
    with BuildSketch(Plane(origin=(-69.982217792, 88.300214624, -197.54087915), x_dir=(0.8788843703548711, 0, 0.477034866174289), z_dir=(0, -1, 0))) as redondeo3_piece_1:
        with BuildLine():
            CenterArc((2.268077265, 1.984059393), REDONDEO3_R, 172.761243907, 104.477512186)
            Line((0.284017872, 2.236067977), (0, 0))
            ThreePointArc((0, 0), (1.260042925, -0.079703037), (2.52008585, 0))
        make_face()
    extrude(amount=22.600429248, mode=Mode.SUBTRACT)
    with BuildSketch(Plane(origin=(-71.269055695, 86.399756393, -194.232322333), x_dir=(0.3624895501390437, 0, -0.9319878357789836), z_dir=(0, -1, 0))) as redondeo3_piece_2:
        with BuildLine():
            CenterArc((1.759902557, 2), REDONDEO3_R, 193.691050596, 76.308949404)
            ThreePointArc((-0.183269646, 1.526627219), (-0.045981309, 0.768794255), (0, 0))
            Line((0, 0), (1.759902557, 0))
        make_face()
    extrude(amount=18.799512786, mode=Mode.SUBTRACT)
    with BuildSketch(Plane(origin=(-79.618434834, 86.399756393, -190.55905839), x_dir=(-0.931987835778983, 0, -0.3624895501390453), z_dir=(0, -1, 0))) as redondeo3_piece_3:
        with BuildLine():
            CenterArc((1.759902557, -2), REDONDEO3_R, 90, 76.308949404)
            ThreePointArc((-0.183269646, -1.526627219), (-0.045981309, -0.768794255), (0, 0))
            Line((0, 0), (1.759902557, 0))
        make_face()
    extrude(amount=18.799512786, mode=Mode.SUBTRACT)
    with BuildSketch(Plane(origin=(-82.926991651, 88.300214624, -191.845896293), x_dir=(-0.2421659304746274, 0, 0.9702348489501693), z_dir=(0, -1, 0))) as redondeo3_piece_4:
        with BuildLine():
            CenterArc((2.268077265, -1.984059393), REDONDEO3_R, 82.761243907, 104.477512186)
            Line((0.284017872, -2.236067977), (0, 0))
            ThreePointArc((0, 0), (1.260042925, 0.079703037), (2.52008585, 0))
        make_face()
    extrude(amount=22.600429248, mode=Mode.SUBTRACT)


solid = part.part
